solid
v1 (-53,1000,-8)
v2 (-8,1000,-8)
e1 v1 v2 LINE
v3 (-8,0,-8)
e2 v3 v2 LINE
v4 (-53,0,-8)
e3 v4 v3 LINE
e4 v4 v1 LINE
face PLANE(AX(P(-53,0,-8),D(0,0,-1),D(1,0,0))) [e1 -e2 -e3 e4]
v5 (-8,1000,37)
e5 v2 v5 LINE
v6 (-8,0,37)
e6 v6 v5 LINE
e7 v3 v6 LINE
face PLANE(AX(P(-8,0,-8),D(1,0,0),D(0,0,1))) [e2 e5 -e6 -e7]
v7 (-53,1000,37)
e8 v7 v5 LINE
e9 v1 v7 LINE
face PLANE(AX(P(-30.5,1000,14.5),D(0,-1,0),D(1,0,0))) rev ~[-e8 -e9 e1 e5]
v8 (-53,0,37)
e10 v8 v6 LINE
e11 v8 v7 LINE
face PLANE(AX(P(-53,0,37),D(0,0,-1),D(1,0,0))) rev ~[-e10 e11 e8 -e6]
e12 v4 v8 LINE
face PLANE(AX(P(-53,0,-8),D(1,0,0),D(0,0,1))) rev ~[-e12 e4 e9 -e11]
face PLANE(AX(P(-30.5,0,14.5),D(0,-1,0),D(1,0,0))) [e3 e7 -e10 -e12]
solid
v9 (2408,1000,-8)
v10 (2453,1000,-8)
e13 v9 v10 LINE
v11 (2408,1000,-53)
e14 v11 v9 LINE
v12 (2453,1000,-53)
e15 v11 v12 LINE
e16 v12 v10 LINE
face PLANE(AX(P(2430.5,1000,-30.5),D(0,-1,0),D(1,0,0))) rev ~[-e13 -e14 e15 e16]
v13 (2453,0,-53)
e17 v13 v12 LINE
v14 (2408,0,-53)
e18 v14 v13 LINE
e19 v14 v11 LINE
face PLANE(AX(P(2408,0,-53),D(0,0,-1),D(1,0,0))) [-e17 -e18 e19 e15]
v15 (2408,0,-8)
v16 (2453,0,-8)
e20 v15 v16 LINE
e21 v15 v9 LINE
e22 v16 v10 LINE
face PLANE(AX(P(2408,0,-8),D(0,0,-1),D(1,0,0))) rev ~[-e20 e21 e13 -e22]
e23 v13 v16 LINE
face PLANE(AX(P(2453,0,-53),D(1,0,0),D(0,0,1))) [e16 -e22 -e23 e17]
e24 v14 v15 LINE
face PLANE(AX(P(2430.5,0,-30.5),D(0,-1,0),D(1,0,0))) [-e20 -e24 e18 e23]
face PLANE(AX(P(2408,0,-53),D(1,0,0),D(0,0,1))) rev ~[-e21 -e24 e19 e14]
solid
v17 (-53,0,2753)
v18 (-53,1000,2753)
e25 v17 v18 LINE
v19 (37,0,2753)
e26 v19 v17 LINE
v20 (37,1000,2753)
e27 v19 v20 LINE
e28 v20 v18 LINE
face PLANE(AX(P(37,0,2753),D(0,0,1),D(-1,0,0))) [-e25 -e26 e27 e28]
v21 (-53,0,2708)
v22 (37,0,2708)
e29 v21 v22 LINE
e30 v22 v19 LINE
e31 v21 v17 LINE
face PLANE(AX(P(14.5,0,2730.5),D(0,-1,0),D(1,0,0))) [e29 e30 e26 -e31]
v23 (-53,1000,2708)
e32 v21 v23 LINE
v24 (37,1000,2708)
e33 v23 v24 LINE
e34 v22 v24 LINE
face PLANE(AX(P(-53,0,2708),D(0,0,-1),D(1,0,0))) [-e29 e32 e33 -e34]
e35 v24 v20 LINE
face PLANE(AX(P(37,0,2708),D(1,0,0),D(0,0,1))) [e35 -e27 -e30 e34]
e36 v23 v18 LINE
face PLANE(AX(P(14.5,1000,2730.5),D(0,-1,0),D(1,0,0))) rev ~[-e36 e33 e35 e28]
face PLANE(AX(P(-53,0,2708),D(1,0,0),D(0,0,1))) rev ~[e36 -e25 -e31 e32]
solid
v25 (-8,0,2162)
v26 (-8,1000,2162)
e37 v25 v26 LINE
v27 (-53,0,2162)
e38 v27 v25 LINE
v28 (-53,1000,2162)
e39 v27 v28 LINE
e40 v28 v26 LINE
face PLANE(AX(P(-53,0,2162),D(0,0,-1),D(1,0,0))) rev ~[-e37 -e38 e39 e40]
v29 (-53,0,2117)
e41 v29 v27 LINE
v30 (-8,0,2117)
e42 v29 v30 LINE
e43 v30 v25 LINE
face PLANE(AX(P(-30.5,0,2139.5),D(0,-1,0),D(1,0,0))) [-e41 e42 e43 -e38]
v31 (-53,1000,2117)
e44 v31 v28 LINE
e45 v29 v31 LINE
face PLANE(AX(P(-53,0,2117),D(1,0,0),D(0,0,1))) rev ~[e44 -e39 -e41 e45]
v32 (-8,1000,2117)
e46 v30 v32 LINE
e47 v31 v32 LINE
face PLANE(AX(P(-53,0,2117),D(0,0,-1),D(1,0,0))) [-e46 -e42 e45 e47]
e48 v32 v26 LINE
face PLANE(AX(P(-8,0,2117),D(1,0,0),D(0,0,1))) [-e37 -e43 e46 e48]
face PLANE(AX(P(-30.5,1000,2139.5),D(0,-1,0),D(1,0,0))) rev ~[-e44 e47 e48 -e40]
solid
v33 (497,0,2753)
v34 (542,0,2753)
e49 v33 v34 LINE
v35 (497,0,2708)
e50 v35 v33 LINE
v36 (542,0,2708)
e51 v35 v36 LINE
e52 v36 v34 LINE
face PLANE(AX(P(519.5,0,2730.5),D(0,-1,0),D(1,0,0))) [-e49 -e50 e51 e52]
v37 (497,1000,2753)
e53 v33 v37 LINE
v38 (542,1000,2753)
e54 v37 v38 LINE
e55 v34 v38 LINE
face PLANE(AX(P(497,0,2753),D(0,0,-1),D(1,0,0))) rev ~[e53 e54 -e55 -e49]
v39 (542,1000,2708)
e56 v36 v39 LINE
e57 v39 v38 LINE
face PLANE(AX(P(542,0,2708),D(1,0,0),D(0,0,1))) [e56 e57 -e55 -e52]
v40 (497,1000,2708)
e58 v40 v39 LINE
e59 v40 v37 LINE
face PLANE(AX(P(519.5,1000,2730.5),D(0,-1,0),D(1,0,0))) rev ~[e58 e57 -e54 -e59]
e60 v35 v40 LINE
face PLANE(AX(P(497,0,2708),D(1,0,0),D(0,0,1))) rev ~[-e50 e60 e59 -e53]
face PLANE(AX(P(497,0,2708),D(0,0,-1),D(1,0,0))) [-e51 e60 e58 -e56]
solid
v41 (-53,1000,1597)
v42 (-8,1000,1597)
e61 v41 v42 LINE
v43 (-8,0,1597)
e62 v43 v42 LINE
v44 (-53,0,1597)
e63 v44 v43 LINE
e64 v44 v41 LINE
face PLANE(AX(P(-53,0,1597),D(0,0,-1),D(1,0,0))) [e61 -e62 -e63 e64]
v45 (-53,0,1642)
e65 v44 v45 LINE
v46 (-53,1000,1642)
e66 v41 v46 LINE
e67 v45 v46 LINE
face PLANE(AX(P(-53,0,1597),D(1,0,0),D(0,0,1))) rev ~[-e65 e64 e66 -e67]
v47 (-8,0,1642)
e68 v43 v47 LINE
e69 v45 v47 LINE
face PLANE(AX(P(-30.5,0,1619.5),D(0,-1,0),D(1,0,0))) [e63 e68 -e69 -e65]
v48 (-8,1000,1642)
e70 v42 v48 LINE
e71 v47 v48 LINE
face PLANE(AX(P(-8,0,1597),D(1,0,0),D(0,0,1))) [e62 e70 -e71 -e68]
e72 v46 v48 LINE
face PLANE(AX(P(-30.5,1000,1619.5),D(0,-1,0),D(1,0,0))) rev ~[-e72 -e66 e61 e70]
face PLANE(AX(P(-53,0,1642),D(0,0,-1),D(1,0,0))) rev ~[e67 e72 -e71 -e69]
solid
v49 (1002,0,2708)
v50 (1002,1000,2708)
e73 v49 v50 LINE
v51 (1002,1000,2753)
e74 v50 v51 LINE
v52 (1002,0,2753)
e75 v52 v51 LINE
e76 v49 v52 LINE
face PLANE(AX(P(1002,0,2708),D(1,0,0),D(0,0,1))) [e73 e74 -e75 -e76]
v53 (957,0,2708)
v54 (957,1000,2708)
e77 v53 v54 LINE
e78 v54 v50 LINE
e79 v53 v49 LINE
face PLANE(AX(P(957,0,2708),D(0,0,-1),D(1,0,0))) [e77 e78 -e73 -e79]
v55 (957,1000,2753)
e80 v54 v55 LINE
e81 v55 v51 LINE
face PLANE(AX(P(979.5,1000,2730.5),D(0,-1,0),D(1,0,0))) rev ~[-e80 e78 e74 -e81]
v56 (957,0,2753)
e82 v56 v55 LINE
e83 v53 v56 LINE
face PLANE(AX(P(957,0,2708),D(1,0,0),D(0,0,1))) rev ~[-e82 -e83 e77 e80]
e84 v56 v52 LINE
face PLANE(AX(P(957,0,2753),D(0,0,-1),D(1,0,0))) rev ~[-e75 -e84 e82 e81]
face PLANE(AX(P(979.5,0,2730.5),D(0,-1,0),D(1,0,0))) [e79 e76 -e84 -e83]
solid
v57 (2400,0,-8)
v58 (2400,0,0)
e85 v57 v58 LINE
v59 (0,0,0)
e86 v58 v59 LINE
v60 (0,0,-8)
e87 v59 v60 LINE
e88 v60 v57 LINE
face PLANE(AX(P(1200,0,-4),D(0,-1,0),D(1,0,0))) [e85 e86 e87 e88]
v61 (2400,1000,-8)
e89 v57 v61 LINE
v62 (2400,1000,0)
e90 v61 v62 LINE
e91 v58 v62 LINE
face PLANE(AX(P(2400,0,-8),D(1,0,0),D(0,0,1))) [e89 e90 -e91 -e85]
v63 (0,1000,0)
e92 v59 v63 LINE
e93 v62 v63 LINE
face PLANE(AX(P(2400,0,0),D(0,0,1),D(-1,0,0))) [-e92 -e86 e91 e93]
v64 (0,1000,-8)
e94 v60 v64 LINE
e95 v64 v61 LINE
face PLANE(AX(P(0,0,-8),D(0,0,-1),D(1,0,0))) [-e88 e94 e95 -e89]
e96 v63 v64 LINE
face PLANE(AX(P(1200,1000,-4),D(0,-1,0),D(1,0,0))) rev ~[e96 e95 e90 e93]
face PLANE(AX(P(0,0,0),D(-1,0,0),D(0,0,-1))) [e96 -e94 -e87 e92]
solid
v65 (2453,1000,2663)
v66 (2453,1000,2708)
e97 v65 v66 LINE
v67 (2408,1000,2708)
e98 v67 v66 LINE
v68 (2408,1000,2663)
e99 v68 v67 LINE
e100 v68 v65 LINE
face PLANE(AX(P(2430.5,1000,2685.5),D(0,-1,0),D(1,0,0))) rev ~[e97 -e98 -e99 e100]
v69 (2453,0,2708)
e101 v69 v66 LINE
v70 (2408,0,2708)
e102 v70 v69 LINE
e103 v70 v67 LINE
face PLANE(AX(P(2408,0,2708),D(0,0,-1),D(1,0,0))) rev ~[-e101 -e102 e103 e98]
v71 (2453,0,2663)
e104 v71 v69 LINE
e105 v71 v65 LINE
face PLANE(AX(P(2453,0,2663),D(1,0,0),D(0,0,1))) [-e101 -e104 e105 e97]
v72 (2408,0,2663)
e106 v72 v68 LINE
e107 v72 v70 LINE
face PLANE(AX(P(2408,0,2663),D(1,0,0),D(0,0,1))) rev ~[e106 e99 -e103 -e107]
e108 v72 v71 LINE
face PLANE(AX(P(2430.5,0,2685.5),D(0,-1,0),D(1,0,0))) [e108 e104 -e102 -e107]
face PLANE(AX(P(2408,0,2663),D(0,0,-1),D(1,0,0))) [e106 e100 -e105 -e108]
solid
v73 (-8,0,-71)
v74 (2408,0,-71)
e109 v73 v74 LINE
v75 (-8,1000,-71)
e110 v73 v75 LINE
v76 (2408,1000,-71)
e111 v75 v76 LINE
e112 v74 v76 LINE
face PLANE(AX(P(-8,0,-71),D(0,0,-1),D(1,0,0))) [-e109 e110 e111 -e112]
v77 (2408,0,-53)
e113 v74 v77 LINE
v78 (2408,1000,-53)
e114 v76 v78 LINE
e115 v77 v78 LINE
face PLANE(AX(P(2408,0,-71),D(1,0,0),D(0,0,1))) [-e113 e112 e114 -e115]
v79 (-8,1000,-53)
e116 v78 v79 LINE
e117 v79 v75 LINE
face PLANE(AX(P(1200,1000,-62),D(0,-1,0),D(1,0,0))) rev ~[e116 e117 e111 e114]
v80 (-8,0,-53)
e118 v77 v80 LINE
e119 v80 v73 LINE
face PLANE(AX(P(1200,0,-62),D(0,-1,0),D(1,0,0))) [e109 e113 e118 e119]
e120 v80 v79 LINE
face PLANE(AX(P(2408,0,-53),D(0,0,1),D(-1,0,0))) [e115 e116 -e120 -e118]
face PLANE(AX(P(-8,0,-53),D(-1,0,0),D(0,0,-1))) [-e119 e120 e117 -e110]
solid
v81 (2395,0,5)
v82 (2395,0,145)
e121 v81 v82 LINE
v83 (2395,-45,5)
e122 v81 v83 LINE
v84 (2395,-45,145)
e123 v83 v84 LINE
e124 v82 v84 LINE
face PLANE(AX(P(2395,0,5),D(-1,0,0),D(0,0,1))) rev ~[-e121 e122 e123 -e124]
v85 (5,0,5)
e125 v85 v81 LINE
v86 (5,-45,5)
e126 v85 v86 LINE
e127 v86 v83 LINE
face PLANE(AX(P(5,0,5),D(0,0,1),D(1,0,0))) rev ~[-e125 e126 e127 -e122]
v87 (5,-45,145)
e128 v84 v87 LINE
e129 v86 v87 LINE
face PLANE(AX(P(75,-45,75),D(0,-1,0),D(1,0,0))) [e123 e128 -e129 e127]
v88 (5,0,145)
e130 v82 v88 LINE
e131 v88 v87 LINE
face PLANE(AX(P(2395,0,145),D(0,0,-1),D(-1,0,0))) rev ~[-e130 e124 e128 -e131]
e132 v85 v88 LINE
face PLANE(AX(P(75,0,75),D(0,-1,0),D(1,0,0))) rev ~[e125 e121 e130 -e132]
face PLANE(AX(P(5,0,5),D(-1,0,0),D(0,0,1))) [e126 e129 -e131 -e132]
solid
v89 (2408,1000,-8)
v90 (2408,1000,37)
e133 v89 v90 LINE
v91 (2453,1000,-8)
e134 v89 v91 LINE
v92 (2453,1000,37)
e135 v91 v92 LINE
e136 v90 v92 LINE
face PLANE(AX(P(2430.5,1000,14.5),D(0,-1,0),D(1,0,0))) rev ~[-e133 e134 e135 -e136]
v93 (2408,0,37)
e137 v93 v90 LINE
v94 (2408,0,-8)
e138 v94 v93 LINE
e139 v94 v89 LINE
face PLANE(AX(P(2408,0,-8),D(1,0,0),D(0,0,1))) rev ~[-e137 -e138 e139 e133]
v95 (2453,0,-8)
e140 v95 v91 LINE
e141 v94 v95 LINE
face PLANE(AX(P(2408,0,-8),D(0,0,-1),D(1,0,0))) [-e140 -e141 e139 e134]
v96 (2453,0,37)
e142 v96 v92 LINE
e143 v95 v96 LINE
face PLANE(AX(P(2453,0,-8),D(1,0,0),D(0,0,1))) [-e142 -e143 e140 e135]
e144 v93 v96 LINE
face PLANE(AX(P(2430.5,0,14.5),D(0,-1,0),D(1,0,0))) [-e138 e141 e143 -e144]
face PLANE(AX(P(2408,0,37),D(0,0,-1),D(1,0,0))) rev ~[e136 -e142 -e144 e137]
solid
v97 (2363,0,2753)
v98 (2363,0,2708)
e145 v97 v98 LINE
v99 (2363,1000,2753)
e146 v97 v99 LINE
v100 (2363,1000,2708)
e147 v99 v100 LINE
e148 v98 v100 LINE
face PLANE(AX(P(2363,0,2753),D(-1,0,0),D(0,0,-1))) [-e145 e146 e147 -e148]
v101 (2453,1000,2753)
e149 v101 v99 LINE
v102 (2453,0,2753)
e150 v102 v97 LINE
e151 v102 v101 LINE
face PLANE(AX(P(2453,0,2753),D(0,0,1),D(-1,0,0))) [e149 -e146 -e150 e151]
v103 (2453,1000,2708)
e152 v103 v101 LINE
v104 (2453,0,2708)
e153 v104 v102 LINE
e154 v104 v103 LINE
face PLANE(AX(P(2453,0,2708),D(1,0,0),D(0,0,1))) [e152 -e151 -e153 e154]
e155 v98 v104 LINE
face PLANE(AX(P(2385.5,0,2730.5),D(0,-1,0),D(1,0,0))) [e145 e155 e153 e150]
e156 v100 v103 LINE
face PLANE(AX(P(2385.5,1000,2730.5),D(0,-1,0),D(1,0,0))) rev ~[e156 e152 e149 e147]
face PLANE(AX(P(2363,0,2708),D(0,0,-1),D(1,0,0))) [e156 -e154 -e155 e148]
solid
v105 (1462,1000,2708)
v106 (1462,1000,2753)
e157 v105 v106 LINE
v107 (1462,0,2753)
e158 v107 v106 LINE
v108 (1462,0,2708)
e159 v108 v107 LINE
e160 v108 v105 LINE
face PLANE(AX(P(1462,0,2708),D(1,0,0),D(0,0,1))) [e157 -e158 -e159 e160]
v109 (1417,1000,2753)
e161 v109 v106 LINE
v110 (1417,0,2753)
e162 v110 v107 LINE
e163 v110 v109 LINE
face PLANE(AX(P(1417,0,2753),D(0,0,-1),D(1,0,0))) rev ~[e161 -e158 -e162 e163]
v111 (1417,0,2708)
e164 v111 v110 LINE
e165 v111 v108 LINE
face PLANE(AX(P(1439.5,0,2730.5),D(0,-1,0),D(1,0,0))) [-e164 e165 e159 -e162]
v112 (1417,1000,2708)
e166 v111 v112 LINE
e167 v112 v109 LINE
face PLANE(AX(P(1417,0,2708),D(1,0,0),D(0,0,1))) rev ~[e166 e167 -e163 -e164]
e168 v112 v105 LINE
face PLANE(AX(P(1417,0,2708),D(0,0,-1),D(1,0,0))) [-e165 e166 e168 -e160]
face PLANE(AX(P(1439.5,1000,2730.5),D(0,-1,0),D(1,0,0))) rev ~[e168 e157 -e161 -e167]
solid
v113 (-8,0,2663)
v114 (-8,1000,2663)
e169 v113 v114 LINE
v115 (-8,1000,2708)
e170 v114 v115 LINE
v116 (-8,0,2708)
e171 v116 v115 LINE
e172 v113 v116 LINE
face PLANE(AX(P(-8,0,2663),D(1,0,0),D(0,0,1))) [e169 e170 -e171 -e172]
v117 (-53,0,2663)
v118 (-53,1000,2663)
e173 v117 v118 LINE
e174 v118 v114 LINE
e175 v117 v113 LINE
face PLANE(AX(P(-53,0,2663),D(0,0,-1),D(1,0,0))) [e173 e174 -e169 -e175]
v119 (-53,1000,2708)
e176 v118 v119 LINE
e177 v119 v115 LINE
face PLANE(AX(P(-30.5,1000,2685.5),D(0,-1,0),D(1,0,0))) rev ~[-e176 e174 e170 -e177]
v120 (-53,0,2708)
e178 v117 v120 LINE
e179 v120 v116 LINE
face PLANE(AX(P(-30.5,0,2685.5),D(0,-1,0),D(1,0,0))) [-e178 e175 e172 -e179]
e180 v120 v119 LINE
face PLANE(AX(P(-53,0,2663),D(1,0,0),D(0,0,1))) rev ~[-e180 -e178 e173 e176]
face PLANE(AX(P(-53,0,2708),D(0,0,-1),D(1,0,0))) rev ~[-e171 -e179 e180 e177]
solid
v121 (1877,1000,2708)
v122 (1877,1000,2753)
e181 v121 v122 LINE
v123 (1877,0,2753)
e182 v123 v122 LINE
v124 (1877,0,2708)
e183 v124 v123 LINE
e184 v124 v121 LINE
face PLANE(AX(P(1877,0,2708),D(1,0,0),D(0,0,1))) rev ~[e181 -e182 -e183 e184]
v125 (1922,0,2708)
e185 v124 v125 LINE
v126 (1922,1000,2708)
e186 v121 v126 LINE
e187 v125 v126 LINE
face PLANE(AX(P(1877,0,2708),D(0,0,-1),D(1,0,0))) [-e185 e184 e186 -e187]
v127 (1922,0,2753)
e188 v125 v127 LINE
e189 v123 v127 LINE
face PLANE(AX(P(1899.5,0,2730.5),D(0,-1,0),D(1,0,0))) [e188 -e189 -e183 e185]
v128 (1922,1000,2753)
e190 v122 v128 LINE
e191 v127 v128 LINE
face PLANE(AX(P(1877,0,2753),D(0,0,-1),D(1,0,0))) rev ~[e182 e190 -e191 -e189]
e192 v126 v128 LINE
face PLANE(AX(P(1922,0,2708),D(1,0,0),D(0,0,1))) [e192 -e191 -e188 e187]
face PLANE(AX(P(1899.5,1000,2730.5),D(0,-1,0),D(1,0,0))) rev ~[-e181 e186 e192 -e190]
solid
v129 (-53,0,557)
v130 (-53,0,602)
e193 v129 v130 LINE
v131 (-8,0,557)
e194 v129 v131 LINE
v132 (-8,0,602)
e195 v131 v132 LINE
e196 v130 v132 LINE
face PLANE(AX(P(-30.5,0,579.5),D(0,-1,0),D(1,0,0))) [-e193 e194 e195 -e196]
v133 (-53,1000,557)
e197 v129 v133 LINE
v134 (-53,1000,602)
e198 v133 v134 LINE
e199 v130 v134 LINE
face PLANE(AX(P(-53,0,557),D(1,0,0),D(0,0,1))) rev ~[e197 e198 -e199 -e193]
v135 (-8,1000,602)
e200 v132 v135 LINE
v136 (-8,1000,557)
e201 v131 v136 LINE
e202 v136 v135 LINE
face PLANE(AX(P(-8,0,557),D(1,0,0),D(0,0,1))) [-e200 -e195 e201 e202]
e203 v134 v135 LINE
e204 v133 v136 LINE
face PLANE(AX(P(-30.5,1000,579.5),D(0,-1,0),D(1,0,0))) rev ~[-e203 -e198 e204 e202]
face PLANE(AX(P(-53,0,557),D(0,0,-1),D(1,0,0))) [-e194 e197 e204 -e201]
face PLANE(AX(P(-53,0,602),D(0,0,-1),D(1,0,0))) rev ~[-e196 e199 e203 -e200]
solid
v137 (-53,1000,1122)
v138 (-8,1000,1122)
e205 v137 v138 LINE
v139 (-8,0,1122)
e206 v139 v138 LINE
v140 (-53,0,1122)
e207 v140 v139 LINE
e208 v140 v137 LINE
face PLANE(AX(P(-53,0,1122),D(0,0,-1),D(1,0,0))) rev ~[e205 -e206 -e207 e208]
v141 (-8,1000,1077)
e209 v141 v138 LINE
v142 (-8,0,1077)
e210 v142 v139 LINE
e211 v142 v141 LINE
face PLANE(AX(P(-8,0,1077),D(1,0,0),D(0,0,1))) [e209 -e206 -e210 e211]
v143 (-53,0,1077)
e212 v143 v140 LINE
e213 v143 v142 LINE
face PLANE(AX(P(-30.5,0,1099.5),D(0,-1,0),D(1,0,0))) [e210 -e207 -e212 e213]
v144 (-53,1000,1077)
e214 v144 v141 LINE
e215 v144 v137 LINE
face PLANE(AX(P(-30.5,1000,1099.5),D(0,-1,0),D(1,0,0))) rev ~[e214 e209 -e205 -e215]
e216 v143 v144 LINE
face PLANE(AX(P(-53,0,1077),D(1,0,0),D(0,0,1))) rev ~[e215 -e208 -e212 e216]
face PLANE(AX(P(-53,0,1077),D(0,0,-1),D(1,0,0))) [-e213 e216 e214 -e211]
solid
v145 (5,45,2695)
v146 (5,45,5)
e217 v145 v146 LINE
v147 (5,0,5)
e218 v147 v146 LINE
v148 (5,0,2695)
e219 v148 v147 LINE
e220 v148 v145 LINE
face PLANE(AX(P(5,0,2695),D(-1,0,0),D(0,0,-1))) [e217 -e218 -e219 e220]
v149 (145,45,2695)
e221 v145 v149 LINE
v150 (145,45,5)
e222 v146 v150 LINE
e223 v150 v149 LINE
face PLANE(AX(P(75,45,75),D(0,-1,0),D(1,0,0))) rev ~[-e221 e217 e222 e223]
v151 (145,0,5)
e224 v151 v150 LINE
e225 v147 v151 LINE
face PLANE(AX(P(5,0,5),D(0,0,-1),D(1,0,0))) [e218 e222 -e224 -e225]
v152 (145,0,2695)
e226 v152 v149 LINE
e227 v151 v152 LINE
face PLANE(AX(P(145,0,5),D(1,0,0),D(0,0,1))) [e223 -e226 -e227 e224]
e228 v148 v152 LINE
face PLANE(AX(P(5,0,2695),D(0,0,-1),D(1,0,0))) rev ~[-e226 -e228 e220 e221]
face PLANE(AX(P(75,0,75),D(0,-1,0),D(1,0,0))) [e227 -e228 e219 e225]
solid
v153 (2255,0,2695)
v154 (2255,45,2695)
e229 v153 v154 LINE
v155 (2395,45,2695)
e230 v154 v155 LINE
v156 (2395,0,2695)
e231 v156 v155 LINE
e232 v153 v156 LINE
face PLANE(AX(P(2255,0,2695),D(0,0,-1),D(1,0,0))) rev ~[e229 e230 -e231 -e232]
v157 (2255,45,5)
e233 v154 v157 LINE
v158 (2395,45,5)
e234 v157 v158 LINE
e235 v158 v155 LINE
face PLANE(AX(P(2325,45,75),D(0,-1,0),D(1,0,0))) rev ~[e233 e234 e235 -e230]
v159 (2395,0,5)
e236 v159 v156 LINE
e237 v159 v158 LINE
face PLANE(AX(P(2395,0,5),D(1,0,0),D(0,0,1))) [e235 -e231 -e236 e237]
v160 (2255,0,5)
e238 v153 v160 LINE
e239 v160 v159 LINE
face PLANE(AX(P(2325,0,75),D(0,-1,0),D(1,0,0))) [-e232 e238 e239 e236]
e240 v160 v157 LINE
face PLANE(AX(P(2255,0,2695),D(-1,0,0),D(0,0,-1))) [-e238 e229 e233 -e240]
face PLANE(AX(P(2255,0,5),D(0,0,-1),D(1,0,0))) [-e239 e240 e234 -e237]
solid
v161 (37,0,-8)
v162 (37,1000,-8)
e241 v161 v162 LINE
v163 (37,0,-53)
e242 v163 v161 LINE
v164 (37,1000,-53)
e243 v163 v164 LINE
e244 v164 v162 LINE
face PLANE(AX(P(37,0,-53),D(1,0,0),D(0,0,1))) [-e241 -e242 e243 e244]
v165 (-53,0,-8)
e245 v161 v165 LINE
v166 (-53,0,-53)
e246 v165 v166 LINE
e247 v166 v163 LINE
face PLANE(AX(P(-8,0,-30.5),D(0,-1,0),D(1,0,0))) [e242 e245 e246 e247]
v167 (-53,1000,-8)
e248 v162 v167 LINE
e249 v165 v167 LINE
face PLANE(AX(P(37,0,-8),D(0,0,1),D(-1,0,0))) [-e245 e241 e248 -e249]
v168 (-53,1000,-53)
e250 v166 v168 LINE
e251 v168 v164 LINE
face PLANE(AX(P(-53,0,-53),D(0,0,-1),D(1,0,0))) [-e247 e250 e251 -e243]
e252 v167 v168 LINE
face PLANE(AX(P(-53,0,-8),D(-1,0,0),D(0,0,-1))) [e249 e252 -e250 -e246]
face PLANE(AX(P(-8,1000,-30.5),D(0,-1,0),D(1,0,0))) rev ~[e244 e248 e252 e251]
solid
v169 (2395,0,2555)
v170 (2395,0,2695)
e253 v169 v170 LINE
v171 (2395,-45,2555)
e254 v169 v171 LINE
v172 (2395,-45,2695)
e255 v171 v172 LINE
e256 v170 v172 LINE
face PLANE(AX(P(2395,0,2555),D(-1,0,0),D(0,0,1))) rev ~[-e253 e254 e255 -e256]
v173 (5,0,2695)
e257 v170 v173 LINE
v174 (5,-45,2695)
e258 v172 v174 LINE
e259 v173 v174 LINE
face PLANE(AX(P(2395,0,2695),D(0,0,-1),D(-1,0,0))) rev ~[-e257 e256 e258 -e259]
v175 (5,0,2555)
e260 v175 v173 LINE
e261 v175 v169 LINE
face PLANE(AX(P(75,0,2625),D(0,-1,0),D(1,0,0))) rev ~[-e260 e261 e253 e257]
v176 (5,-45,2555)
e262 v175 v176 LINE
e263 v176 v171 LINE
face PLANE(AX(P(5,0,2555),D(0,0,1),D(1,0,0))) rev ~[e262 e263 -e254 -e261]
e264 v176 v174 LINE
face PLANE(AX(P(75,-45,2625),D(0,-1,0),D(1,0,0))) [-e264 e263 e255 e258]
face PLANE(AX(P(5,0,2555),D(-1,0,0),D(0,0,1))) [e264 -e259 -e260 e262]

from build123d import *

# Parameters (mm, degrees)
F0_W     = 140
F0_H     = 140
F0_H_2   = 2410
F1_DEPTH = 45
F0_W_2   = 2110
F2_DEPTH = 45
F3_DEPTH = 1000
F0_W_3   = 45
F0_H_3   = 45
F4_DEPTH = 1000
F5_DEPTH = 1000
F6_DEPTH = 1000
F7_DEPTH = 1000
F8_DEPTH = 1000


with BuildPart() as f1:
    # F0 (on Front) → F1 (new body)
    with BuildSketch(Plane.XZ):
        with Locations((75, 75)):
            Rectangle(F0_W, F0_H)
        with Locations((75, 1350)):
            Rectangle(F0_W, F0_H_2)
        with Locations((75, 2625)):
            Rectangle(F0_W, F0_H)
    extrude(amount=-F1_DEPTH)


with BuildPart() as f1b:
    # F0 (on Front) → F1, piece 2 (new body)
    with BuildSketch(Plane.XZ):
        with Locations((2325, 75)):
            Rectangle(F0_W, F0_H)
        with Locations((2325, 1350)):
            Rectangle(F0_W, F0_H_2)
        with Locations((2325, 2625)):
            Rectangle(F0_W, F0_H)
    extrude(amount=-F1_DEPTH)


with BuildPart() as f2:
    # F0 (on Front) → F2 (new body)
    with BuildSketch(Plane.XZ):
        with Locations((75, 75)):
            Rectangle(F0_W, F0_H)
        with Locations((1200, 75)):
            Rectangle(F0_W_2, F0_H)
        with Locations((2325, 75)):
            Rectangle(F0_W, F0_H)
    extrude(amount=F2_DEPTH)


with BuildPart() as f2b:
    # F0 (on Front) → F2, piece 2 (new body)
    with BuildSketch(Plane.XZ):
        with Locations((75, 2625)):
            Rectangle(F0_W, F0_H)
        with Locations((1200, 2625)):
            Rectangle(F0_W_2, F0_H)
        with Locations((2325, 2625)):
            Rectangle(F0_W, F0_H)
    extrude(amount=F2_DEPTH)


with BuildPart() as f3:
    # F0 (on Front) → F3 (new body)
    with BuildSketch(Plane.XZ):
        Polygon((37, -8), (0, -8), (-8, -8), (-53, -8), (-53, -53), (-8, -53), (37, -53), align=None)
    extrude(amount=-F3_DEPTH)


with BuildPart() as f3b:
    # F0 (on Front) → F3, piece 2 (new body)
    with BuildSketch(Plane.XZ):
        Polygon((-8, 2708), (0, 2708), (37, 2708), (37, 2753), (-8, 2753), align=None)
        with Locations((-30.5, 2730.5)):
            Rectangle(F0_W_3, F0_H_3)
    extrude(amount=-F3_DEPTH)


with BuildPart() as f3c:
    # F0 (on Front) → F3, piece 3 (new body)
    with BuildSketch(Plane.XZ):
        with Locations((2430.5, -30.5)):
            Rectangle(F0_W_3, F0_H_3)
    extrude(amount=-F3_DEPTH)


with BuildPart() as f3d:
    # F0 (on Front) → F3, piece 4 (new body)
    with BuildSketch(Plane.XZ):
        Polygon((2363, 2708), (2400, 2708), (2408, 2708), (2408, 2753), (2363, 2753), align=None)
        with Locations((2430.5, 2730.5)):
            Rectangle(F0_W_3, F0_H_3)
    extrude(amount=-F3_DEPTH)


with BuildPart() as f4:
    # F0 (on Front) → F4 (new body)
    with BuildSketch(Plane.XZ):
        with Locations((-30.5, 2685.5)):
            Rectangle(F0_W_3, F0_H_3)
    extrude(amount=-F4_DEPTH)


with BuildPart() as f4b:
    # F0 (on Front) → F4, piece 2 (new body)
    with BuildSketch(Plane.XZ):
        with Locations((2430.5, 2685.5)):
            Rectangle(F0_W_3, F0_H_3)
    extrude(amount=-F4_DEPTH)


with BuildPart() as f4c:
    # F0 (on Front) → F4, piece 3 (new body)
    with BuildSketch(Plane.XZ):
        with Locations((2430.5, 14.5)):
            Rectangle(F0_W_3, F0_H_3)
    extrude(amount=-F4_DEPTH)


with BuildPart() as f4d:
    # F0 (on Front) → F4, piece 4 (new body)
    with BuildSketch(Plane.XZ):
        with Locations((-30.5, 14.5)):
            Rectangle(F0_W_3, F0_H_3)
    extrude(amount=-F4_DEPTH)


with BuildPart() as f5:
    # F0 (on Front) → F5 (new body)
    with BuildSketch(Plane.XZ):
        Polygon((2354.4380664825, -53), (37, -53), (-8, -53), (-8, -71), (2408, -71), (2408, -53), align=None)
    extrude(amount=-F5_DEPTH)


with BuildPart() as f6:
    # F0 (on Front) → F6 (new body)
    with BuildSketch(Plane.XZ):
        Polygon((145, 0), (0, 0), (0, -8), (37, -8), (2354.4380664825, -8), (2400, -8), (2400, 0), (2255, 0), align=None)
    extrude(amount=-F6_DEPTH)


with BuildPart() as f7:
    # F0 (on Front) → F7 (new body)
    with BuildSketch(Plane.XZ):
        with Locations((519.5, 2730.5)):
            Rectangle(F0_W_3, F0_H_3)
    extrude(amount=-F7_DEPTH)


with BuildPart() as f7b:
    # F0 (on Front) → F7, piece 2 (new body)
    with BuildSketch(Plane.XZ):
        with Locations((979.5, 2730.5)):
            Rectangle(F0_W_3, F0_H_3)
    extrude(amount=-F7_DEPTH)


with BuildPart() as f7c:
    # F0 (on Front) → F7, piece 3 (new body)
    with BuildSketch(Plane.XZ):
        with Locations((1439.5, 2730.5)):
            Rectangle(F0_W_3, F0_H_3)
    extrude(amount=-F7_DEPTH)


with BuildPart() as f7d:
    # F0 (on Front) → F7, piece 4 (new body)
    with BuildSketch(Plane.XZ):
        with Locations((1899.5, 2730.5)):
            Rectangle(F0_W_3, F0_H_3)
    extrude(amount=-F7_DEPTH)


with BuildPart() as f8:
    # F0 (on Front) → F8 (new body)
    with BuildSketch(Plane.XZ):
        with Locations((-30.5, 579.5)):
            Rectangle(F0_W_3, F0_H_3)
    extrude(amount=-F8_DEPTH)


with BuildPart() as f8b:
    # F0 (on Front) → F8, piece 2 (new body)
    with BuildSketch(Plane.XZ):
        with Locations((-30.5, 1099.5)):
            Rectangle(F0_W_3, F0_H_3)
    extrude(amount=-F8_DEPTH)


with BuildPart() as f8c:
    # F0 (on Front) → F8, piece 3 (new body)
    with BuildSketch(Plane.XZ):
        with Locations((-30.5, 1619.5)):
            Rectangle(F0_W_3, F0_H_3)
    extrude(amount=-F8_DEPTH)


with BuildPart() as f8d:
    # F0 (on Front) → F8, piece 4 (new body)
    with BuildSketch(Plane.XZ):
        with Locations((-30.5, 2139.5)):
            Rectangle(F0_W_3, F0_H_3)
    extrude(amount=-F8_DEPTH)


solid = Compound([f1.part, f1b.part, f2.part, f2b.part, f3.part, f3b.part, f3c.part, f3d.part, f4.part, f4b.part, f4c.part, f4d.part, f5.part, f6.part, f7.part, f7b.part, f7c.part, f7d.part, f8.part, f8b.part, f8c.part, f8d.part])
